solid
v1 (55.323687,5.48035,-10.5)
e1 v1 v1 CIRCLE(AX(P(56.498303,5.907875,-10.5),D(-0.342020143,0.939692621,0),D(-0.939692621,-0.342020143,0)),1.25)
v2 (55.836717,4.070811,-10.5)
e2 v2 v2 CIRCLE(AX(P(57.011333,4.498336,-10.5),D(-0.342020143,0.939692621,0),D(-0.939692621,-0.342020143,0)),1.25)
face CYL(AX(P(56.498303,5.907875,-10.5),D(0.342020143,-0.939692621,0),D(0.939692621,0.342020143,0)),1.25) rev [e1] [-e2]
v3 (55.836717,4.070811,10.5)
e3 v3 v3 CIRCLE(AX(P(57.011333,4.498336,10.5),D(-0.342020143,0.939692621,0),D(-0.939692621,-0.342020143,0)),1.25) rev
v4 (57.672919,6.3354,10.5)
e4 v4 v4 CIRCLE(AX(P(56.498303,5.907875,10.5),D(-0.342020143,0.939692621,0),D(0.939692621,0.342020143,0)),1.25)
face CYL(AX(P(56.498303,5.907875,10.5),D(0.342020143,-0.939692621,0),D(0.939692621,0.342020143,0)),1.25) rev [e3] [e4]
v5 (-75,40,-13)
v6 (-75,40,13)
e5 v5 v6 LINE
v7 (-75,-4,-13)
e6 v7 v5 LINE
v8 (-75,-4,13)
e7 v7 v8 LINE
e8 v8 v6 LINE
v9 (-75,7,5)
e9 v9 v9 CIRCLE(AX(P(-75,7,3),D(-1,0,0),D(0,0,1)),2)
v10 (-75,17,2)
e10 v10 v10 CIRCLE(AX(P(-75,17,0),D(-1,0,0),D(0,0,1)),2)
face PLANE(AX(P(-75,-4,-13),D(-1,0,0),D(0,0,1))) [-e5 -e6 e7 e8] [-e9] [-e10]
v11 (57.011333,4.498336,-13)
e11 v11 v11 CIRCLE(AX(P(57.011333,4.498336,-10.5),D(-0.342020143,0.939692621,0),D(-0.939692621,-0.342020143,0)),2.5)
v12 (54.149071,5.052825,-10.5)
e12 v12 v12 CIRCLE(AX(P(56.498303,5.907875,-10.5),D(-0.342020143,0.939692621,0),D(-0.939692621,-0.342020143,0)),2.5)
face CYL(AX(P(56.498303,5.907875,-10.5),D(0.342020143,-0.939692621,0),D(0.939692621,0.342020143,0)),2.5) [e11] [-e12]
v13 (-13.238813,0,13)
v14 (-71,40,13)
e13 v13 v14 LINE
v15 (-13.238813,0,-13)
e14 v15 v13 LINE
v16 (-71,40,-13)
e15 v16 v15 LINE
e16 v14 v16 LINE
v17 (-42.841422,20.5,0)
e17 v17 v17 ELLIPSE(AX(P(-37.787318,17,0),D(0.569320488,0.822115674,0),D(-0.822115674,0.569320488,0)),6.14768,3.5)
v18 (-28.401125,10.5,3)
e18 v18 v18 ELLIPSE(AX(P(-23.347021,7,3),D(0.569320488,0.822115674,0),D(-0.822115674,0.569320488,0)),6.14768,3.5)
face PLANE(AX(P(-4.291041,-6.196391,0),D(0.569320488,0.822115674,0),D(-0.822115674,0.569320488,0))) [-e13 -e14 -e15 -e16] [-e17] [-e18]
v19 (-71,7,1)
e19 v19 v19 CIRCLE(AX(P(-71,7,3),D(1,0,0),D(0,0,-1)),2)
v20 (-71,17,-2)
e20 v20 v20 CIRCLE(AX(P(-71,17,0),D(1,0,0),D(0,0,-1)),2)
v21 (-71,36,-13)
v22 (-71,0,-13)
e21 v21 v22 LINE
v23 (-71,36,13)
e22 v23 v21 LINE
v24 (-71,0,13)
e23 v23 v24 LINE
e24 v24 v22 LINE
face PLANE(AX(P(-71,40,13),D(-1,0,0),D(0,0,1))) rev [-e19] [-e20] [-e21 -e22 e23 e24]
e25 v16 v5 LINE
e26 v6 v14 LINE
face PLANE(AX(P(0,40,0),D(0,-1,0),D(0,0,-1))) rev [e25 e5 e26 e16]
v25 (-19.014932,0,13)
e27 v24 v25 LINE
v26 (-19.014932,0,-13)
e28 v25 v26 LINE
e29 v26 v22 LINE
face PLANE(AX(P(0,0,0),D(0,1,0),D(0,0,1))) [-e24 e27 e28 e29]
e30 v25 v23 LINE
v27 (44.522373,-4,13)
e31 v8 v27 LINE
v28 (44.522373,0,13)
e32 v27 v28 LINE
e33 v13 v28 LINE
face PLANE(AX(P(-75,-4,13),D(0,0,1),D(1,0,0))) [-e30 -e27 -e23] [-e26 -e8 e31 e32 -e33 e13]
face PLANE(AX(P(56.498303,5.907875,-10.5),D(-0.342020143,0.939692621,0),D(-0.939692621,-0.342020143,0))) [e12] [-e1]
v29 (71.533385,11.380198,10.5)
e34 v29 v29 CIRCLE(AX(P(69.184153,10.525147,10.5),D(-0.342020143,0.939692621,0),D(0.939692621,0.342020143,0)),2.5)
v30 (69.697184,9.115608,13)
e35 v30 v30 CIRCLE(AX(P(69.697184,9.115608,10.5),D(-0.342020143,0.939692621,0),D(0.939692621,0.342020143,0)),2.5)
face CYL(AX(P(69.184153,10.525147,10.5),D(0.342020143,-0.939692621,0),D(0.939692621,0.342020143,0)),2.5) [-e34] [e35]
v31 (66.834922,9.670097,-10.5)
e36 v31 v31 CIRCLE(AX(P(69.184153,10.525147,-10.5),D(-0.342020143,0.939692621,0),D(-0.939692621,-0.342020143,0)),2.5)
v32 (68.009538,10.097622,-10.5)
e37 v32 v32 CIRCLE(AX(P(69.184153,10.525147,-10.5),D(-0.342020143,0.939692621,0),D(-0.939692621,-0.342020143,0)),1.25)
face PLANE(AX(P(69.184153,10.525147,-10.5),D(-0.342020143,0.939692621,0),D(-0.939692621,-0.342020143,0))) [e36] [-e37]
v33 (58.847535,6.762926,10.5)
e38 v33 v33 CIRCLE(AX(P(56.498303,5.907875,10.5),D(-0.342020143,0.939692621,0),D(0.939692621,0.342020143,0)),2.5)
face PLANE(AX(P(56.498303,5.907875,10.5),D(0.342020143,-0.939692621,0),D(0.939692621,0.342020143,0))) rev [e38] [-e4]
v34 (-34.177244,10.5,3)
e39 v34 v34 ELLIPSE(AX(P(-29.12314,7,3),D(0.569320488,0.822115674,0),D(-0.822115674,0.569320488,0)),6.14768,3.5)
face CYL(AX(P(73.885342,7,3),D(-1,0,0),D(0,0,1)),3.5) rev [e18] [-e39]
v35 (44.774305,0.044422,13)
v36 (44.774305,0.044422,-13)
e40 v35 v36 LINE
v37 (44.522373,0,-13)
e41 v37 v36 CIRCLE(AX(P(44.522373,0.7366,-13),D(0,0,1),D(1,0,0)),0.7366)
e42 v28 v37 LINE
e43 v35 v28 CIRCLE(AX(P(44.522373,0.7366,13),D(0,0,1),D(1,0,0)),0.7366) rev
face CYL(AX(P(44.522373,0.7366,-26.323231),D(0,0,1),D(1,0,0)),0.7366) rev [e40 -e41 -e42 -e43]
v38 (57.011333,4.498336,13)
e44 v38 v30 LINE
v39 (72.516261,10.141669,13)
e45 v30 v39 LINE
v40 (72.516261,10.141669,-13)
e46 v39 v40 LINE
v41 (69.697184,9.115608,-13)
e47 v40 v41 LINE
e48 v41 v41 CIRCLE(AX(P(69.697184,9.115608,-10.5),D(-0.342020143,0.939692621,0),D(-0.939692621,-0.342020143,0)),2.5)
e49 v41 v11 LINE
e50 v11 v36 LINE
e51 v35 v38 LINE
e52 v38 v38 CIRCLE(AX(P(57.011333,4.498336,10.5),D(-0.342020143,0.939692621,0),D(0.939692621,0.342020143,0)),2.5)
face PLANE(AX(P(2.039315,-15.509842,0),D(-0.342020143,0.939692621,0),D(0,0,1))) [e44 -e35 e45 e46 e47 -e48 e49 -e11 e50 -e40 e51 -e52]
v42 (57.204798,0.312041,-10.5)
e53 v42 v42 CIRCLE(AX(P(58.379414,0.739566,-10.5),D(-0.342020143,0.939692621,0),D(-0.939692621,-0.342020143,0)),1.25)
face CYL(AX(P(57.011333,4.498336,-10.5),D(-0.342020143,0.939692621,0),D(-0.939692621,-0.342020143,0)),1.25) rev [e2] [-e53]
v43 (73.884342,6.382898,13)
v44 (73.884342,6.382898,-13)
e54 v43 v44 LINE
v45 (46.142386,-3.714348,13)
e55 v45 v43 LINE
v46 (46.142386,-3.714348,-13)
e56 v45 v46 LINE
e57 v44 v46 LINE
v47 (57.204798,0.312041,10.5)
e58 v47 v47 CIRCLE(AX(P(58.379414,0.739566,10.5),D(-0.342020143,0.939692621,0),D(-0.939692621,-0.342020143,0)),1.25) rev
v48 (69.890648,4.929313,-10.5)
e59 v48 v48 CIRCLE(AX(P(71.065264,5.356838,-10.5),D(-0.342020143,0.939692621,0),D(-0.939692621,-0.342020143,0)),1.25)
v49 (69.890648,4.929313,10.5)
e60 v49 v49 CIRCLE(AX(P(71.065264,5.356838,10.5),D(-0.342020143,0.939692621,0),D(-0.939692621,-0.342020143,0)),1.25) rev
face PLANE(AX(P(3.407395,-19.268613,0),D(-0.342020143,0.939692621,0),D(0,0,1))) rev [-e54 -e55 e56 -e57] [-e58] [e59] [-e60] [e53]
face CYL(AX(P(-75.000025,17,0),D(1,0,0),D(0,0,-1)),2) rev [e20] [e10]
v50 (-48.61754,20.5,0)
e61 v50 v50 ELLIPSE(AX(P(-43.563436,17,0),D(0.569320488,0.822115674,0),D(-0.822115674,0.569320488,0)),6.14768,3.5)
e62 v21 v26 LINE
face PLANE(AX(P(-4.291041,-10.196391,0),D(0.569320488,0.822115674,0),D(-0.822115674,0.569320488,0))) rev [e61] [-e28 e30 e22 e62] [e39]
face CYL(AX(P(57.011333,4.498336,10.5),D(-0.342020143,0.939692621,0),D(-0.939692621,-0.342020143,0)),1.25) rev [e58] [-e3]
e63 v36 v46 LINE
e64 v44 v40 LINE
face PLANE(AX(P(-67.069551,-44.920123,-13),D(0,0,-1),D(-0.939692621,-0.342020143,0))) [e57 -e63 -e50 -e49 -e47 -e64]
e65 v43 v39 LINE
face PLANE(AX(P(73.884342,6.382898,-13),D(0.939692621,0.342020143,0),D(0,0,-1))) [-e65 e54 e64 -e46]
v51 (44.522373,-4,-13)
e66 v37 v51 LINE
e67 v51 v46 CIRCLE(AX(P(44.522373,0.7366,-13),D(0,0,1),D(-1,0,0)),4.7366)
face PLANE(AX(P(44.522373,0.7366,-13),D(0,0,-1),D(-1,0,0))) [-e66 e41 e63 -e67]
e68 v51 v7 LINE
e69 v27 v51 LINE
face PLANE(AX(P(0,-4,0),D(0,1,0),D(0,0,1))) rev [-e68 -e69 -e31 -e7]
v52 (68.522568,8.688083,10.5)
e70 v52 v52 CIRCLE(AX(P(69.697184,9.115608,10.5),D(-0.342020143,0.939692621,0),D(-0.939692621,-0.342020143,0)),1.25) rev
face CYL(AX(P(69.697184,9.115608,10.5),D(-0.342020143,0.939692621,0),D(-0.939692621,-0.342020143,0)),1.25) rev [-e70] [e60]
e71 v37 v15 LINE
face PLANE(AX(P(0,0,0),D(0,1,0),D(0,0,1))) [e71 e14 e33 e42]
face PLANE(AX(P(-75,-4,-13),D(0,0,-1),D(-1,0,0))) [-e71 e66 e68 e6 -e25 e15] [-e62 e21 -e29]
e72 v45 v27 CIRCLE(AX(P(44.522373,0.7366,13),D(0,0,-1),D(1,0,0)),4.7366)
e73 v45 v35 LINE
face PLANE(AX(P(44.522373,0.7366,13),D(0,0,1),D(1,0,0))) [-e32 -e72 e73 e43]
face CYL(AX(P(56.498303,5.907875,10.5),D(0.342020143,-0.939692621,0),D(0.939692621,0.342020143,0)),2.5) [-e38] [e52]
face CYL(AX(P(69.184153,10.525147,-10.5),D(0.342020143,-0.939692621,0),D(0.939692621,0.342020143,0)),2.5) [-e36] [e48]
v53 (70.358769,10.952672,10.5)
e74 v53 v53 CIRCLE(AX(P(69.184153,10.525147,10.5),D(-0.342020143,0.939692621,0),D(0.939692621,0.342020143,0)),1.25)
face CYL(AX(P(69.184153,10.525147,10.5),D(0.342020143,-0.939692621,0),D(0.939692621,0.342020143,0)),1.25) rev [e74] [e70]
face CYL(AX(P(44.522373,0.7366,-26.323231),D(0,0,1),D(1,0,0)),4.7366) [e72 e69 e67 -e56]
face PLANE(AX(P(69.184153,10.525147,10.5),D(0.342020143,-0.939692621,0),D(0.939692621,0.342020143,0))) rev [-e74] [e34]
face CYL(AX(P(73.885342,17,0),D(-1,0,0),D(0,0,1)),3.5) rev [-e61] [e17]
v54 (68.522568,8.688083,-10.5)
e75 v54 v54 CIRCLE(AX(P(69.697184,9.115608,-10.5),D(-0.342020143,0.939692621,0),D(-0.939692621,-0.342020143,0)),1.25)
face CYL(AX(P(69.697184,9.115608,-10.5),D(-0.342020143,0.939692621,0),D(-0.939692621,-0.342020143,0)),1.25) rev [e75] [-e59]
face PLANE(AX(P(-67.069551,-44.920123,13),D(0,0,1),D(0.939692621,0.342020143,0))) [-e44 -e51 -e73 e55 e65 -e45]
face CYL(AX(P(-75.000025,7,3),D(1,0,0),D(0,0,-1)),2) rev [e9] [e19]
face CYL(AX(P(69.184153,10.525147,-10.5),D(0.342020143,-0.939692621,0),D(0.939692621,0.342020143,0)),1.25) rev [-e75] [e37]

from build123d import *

# Parameters (mm, degrees)
ESQUISSE2_W                 = 150
ESQUISSE2_H                 = 26
T_LE_DE_BASE_PLI_E1_DEPTH   = 4
PLI_START                   = -13
PLI_ESQUISS_1_DEPTH         = 26
PLI_ESQUISS_1_2_DEPTH       = 26
ESQUISSE9_R                 = 2.5
ESQUISSE9_R_2               = 1.25
BOSS_EXTRU_1_DEPTH          = 1.5
ENL_V_START                 = -4
ENL_V_MAT_EXTRU_1_OUTLINE_R = 1.25
ENL_V_MAT_EXTRU_1_DEPTH     = 4
ESQUISSE11_W                = 4
ESQUISSE11_H                = 26
BOSS_EXTRU_2_DEPTH          = 40
BOSS_EXTRU_3_DEPTH          = 4
ESQUISSE12_R                = 2
ENL_V_MAT_EXTRU_5_DEPTH     = 151.86574353
ENL_V_MAT_EXTRU_6_REACH     = 152.866
ESQUISSE12_4_R              = 3.5
ESQUISSE12_4_R_2            = 2


# Read off the part's stored shape, not the designer's step: Pli esquissé1, Enlèv. mat.-Extru.1
# Sheet-metal steps are written as plain solids
with BuildPart() as part:
    # Esquisse2 → Tôle de base pliée1 (new body)
    with BuildSketch(Plane(origin=(0, 0, 0), x_dir=(1, 0, 0), z_dir=(0, 1, 0))):
        Rectangle(ESQUISSE2_W, ESQUISSE2_H)
    extrude(amount=-T_LE_DE_BASE_PLI_E1_DEPTH)

    # Pli esquissé1 outline → Pli esquissé1 (cut)
    with BuildSketch(Plane.XY.offset(PLI_START)):
        with BuildLine():
            Line((75, 0), (56.347473252, 0))
            Line((56.347473252, 0), (46.142385808, -3.714348068))
            ThreePointArc((46.142385808, -3.714348068), (45.344875155, -3.928040403), (44.522373197, -4))
            Line((44.522373197, -4), (75, -4))
            Line((75, -4), (75, 0))
        make_face()
    extrude(amount=PLI_ESQUISS_1_DEPTH, mode=Mode.SUBTRACT)

    # Pli esquiss_1 2 outline → Pli esquiss_1 2 (add)
    with BuildSketch(Plane.XY.offset(PLI_START)):
        with BuildLine():
            Line((56.347473252, 0), (73.884342049, 6.382898245))
            Line((73.884342049, 6.382898245), (72.516261476, 10.141668728))
            Line((72.516261476, 10.141668728), (44.774305234, 0.044422416))
            ThreePointArc((44.774305234, 0.044422416), (44.650282444, 0.011190609), (44.522373197, 0))
            Line((44.522373197, 0), (56.347473252, 0))
        make_face()
    extrude(amount=PLI_ESQUISS_1_2_DEPTH)

    # Esquisse9 → Boss.-Extru.1 (add)
    # profile 1 of 4: a face of its own
    with BuildSketch(Plane(origin=(5.223321668, -14.350958338, 0), x_dir=(0.9396926207859082, 0.34202014332566943, 0), z_dir=(-0.34202014332566943, 0.9396926207859082, 0))):
        with Locations(Location((55.111650787, 10.5, 0), (0, 0, 90))):
            Circle(ESQUISSE9_R)
        with Locations(Location((55.111650787, 10.5, 0), (0, 0, 180))):
            Circle(ESQUISSE9_R_2, mode=Mode.SUBTRACT)
    # profile 2 of 4: a face of its own
    with BuildSketch(Plane(origin=(5.223321668, -14.350958338, 0), x_dir=(0.9396926207859082, 0.34202014332566943, 0), z_dir=(-0.34202014332566943, 0.9396926207859082, 0))):
        with Locations(Location((68.611650787, 10.5, 0), (0, 0, 90))):
            Circle(ESQUISSE9_R)
        with Locations(Location((68.611650787, 10.5, 0), (0, 0, 180))):
            Circle(ESQUISSE9_R_2, mode=Mode.SUBTRACT)
    # profile 3 of 4: a face of its own
    with BuildSketch(Plane(origin=(5.223321668, -14.350958338, 0), x_dir=(0.9396926207859082, 0.34202014332566943, 0), z_dir=(-0.34202014332566943, 0.9396926207859082, 0))):
        with Locations((68.611650787, -10.5)):
            Circle(ESQUISSE9_R)
        with Locations((68.611650787, -10.5)):
            Circle(ESQUISSE9_R_2, mode=Mode.SUBTRACT)
    # profile 4 of 4: a face of its own
    with BuildSketch(Plane(origin=(5.223321668, -14.350958338, 0), x_dir=(0.9396926207859082, 0.34202014332566943, 0), z_dir=(-0.34202014332566943, 0.9396926207859082, 0))):
        with Locations((55.111650787, -10.5)):
            Circle(ESQUISSE9_R)
        with Locations((55.111650787, -10.5)):
            Circle(ESQUISSE9_R_2, mode=Mode.SUBTRACT)
    extrude(amount=BOSS_EXTRU_1_DEPTH)

    # Enlèv. mat.-Extru.1 outline → Enlèv. mat.-Extru.1 (cut)
    with BuildSketch(Plane(origin=(5.223321668, -14.350958338, 0), x_dir=(0.9396926207859082, 0.34202014332566943, 0), z_dir=(-0.34202014332566943, 0.9396926207859082, 0)).offset(ENL_V_START)):
        with Locations((68.611650787, 10.5)):
            Circle(ENL_V_MAT_EXTRU_1_OUTLINE_R)
        with Locations((68.611650787, -10.5)):
            Circle(ENL_V_MAT_EXTRU_1_OUTLINE_R)
        with Locations((55.111650787, 10.5)):
            Circle(ENL_V_MAT_EXTRU_1_OUTLINE_R)
        with Locations((55.111650787, -10.5)):
            Circle(ENL_V_MAT_EXTRU_1_OUTLINE_R)
    extrude(amount=ENL_V_MAT_EXTRU_1_DEPTH, mode=Mode.SUBTRACT)

    # Esquisse11 → Boss.-Extru.2 (add)
    with BuildSketch(Plane(origin=(0, 0, 0), x_dir=(1, 0, 0), z_dir=(0, 1, 0))):
        with Locations((-73, 0)):
            Rectangle(ESQUISSE11_W, ESQUISSE11_H)
    extrude(amount=BOSS_EXTRU_2_DEPTH)

    # Esquisse3D1 → Boss.-Extru.3 (add, along a direction that is not the sketch's normal)
    with BuildSketch(Plane(origin=(-71, 40, -13), x_dir=(0.7710162866859277, -0.533933827949873, 0.34705698816741753), z_dir=(0.5693204883585811, 0.8221156740600114, 0))):
        Polygon((0, 0), (9.023481692, -24.38394509), (74.915650416, 0), (65.892168724, 24.38394509), align=None)
    extrude(amount=-BOSS_EXTRU_3_DEPTH, dir=(0, 1, 0))

    # Esquisse12 → Enlèv. mat.-Extru.5 (cut, through all)
    with BuildSketch(Plane(origin=(-71, 0, 0), x_dir=(0, 0, -1), z_dir=(1, 0, 0))):
        with Locations((-3, 7)):
            Circle(ESQUISSE12_R)
        with Locations((0, 17)):
            Circle(ESQUISSE12_R)
    extrude(amount=-ENL_V_MAT_EXTRU_5_DEPTH, mode=Mode.SUBTRACT)

    # Enlèv. mat.-Extru.6: up to this plane
    enl_v_mat_extru_6_end = Plane(origin=(-4.291041229, -6.196390829, 0), z_dir=(0.5693204883585812, 0.8221156740600113, 0))
    # Esquisse12<4> → Enlèv. mat.-Extru.6 (cut, up to the surface)
    with BuildSketch(Plane(origin=(-71, 0, 0), x_dir=(0, 0, -1), z_dir=(1, 0, 0)), mode=Mode.PRIVATE) as enl_v_mat_extru_6_sk1:
        with Locations(Location((-3, 7, 0), (0, 0, 90))):
            Circle(ESQUISSE12_4_R)
        with Locations((-3, 7)):
            Circle(ESQUISSE12_4_R_2, mode=Mode.SUBTRACT)
    enl_v_mat_extru_6_tool1 = split(extrude(enl_v_mat_extru_6_sk1.sketch, amount=ENL_V_MAT_EXTRU_6_REACH, mode=Mode.PRIVATE), bisect_by=enl_v_mat_extru_6_end, keep=Keep.BOTH, mode=Mode.PRIVATE)
    add(enl_v_mat_extru_6_tool1.solids().sort_by_distance((-71, 3.598995, 3))[0], mode=Mode.SUBTRACT)
    # Esquisse12<4> → Enlèv. mat.-Extru.6 (cut, up to the surface)
    with BuildSketch(Plane(origin=(-71, 0, 0), x_dir=(0, 0, -1), z_dir=(1, 0, 0)), mode=Mode.PRIVATE) as enl_v_mat_extru_6_sk2:
        with Locations((-3, 7)):
            Circle(ESQUISSE12_4_R_2)
    enl_v_mat_extru_6_tool2 = split(extrude(enl_v_mat_extru_6_sk2.sketch, amount=ENL_V_MAT_EXTRU_6_REACH, mode=Mode.PRIVATE), bisect_by=enl_v_mat_extru_6_end, keep=Keep.BOTH, mode=Mode.PRIVATE)
    add(enl_v_mat_extru_6_tool2.solids().sort_by_distance((-71, 7, 3))[0], mode=Mode.SUBTRACT)
    # Esquisse12<4> → Enlèv. mat.-Extru.6 (cut, up to the surface)
    with BuildSketch(Plane(origin=(-71, 0, 0), x_dir=(0, 0, -1), z_dir=(1, 0, 0)), mode=Mode.PRIVATE) as enl_v_mat_extru_6_sk3:
        with Locations(Location((0, 17, 0), (0, 0, 90))):
            Circle(ESQUISSE12_4_R)
        with Locations((0, 17)):
            Circle(ESQUISSE12_4_R_2, mode=Mode.SUBTRACT)
    enl_v_mat_extru_6_tool3 = split(extrude(enl_v_mat_extru_6_sk3.sketch, amount=ENL_V_MAT_EXTRU_6_REACH, mode=Mode.PRIVATE), bisect_by=enl_v_mat_extru_6_end, keep=Keep.BOTH, mode=Mode.PRIVATE)
    add(enl_v_mat_extru_6_tool3.solids().sort_by_distance((-71, 13.598995, 0))[0], mode=Mode.SUBTRACT)
    # Esquisse12<4> → Enlèv. mat.-Extru.6 (cut, up to the surface)
    with BuildSketch(Plane(origin=(-71, 0, 0), x_dir=(0, 0, -1), z_dir=(1, 0, 0)), mode=Mode.PRIVATE) as enl_v_mat_extru_6_sk4:
        with Locations((0, 17)):
            Circle(ESQUISSE12_4_R_2)
    enl_v_mat_extru_6_tool4 = split(extrude(enl_v_mat_extru_6_sk4.sketch, amount=ENL_V_MAT_EXTRU_6_REACH, mode=Mode.PRIVATE), bisect_by=enl_v_mat_extru_6_end, keep=Keep.BOTH, mode=Mode.PRIVATE)
    add(enl_v_mat_extru_6_tool4.solids().sort_by_distance((-71, 17, 0))[0], mode=Mode.SUBTRACT)


solid = part.part
